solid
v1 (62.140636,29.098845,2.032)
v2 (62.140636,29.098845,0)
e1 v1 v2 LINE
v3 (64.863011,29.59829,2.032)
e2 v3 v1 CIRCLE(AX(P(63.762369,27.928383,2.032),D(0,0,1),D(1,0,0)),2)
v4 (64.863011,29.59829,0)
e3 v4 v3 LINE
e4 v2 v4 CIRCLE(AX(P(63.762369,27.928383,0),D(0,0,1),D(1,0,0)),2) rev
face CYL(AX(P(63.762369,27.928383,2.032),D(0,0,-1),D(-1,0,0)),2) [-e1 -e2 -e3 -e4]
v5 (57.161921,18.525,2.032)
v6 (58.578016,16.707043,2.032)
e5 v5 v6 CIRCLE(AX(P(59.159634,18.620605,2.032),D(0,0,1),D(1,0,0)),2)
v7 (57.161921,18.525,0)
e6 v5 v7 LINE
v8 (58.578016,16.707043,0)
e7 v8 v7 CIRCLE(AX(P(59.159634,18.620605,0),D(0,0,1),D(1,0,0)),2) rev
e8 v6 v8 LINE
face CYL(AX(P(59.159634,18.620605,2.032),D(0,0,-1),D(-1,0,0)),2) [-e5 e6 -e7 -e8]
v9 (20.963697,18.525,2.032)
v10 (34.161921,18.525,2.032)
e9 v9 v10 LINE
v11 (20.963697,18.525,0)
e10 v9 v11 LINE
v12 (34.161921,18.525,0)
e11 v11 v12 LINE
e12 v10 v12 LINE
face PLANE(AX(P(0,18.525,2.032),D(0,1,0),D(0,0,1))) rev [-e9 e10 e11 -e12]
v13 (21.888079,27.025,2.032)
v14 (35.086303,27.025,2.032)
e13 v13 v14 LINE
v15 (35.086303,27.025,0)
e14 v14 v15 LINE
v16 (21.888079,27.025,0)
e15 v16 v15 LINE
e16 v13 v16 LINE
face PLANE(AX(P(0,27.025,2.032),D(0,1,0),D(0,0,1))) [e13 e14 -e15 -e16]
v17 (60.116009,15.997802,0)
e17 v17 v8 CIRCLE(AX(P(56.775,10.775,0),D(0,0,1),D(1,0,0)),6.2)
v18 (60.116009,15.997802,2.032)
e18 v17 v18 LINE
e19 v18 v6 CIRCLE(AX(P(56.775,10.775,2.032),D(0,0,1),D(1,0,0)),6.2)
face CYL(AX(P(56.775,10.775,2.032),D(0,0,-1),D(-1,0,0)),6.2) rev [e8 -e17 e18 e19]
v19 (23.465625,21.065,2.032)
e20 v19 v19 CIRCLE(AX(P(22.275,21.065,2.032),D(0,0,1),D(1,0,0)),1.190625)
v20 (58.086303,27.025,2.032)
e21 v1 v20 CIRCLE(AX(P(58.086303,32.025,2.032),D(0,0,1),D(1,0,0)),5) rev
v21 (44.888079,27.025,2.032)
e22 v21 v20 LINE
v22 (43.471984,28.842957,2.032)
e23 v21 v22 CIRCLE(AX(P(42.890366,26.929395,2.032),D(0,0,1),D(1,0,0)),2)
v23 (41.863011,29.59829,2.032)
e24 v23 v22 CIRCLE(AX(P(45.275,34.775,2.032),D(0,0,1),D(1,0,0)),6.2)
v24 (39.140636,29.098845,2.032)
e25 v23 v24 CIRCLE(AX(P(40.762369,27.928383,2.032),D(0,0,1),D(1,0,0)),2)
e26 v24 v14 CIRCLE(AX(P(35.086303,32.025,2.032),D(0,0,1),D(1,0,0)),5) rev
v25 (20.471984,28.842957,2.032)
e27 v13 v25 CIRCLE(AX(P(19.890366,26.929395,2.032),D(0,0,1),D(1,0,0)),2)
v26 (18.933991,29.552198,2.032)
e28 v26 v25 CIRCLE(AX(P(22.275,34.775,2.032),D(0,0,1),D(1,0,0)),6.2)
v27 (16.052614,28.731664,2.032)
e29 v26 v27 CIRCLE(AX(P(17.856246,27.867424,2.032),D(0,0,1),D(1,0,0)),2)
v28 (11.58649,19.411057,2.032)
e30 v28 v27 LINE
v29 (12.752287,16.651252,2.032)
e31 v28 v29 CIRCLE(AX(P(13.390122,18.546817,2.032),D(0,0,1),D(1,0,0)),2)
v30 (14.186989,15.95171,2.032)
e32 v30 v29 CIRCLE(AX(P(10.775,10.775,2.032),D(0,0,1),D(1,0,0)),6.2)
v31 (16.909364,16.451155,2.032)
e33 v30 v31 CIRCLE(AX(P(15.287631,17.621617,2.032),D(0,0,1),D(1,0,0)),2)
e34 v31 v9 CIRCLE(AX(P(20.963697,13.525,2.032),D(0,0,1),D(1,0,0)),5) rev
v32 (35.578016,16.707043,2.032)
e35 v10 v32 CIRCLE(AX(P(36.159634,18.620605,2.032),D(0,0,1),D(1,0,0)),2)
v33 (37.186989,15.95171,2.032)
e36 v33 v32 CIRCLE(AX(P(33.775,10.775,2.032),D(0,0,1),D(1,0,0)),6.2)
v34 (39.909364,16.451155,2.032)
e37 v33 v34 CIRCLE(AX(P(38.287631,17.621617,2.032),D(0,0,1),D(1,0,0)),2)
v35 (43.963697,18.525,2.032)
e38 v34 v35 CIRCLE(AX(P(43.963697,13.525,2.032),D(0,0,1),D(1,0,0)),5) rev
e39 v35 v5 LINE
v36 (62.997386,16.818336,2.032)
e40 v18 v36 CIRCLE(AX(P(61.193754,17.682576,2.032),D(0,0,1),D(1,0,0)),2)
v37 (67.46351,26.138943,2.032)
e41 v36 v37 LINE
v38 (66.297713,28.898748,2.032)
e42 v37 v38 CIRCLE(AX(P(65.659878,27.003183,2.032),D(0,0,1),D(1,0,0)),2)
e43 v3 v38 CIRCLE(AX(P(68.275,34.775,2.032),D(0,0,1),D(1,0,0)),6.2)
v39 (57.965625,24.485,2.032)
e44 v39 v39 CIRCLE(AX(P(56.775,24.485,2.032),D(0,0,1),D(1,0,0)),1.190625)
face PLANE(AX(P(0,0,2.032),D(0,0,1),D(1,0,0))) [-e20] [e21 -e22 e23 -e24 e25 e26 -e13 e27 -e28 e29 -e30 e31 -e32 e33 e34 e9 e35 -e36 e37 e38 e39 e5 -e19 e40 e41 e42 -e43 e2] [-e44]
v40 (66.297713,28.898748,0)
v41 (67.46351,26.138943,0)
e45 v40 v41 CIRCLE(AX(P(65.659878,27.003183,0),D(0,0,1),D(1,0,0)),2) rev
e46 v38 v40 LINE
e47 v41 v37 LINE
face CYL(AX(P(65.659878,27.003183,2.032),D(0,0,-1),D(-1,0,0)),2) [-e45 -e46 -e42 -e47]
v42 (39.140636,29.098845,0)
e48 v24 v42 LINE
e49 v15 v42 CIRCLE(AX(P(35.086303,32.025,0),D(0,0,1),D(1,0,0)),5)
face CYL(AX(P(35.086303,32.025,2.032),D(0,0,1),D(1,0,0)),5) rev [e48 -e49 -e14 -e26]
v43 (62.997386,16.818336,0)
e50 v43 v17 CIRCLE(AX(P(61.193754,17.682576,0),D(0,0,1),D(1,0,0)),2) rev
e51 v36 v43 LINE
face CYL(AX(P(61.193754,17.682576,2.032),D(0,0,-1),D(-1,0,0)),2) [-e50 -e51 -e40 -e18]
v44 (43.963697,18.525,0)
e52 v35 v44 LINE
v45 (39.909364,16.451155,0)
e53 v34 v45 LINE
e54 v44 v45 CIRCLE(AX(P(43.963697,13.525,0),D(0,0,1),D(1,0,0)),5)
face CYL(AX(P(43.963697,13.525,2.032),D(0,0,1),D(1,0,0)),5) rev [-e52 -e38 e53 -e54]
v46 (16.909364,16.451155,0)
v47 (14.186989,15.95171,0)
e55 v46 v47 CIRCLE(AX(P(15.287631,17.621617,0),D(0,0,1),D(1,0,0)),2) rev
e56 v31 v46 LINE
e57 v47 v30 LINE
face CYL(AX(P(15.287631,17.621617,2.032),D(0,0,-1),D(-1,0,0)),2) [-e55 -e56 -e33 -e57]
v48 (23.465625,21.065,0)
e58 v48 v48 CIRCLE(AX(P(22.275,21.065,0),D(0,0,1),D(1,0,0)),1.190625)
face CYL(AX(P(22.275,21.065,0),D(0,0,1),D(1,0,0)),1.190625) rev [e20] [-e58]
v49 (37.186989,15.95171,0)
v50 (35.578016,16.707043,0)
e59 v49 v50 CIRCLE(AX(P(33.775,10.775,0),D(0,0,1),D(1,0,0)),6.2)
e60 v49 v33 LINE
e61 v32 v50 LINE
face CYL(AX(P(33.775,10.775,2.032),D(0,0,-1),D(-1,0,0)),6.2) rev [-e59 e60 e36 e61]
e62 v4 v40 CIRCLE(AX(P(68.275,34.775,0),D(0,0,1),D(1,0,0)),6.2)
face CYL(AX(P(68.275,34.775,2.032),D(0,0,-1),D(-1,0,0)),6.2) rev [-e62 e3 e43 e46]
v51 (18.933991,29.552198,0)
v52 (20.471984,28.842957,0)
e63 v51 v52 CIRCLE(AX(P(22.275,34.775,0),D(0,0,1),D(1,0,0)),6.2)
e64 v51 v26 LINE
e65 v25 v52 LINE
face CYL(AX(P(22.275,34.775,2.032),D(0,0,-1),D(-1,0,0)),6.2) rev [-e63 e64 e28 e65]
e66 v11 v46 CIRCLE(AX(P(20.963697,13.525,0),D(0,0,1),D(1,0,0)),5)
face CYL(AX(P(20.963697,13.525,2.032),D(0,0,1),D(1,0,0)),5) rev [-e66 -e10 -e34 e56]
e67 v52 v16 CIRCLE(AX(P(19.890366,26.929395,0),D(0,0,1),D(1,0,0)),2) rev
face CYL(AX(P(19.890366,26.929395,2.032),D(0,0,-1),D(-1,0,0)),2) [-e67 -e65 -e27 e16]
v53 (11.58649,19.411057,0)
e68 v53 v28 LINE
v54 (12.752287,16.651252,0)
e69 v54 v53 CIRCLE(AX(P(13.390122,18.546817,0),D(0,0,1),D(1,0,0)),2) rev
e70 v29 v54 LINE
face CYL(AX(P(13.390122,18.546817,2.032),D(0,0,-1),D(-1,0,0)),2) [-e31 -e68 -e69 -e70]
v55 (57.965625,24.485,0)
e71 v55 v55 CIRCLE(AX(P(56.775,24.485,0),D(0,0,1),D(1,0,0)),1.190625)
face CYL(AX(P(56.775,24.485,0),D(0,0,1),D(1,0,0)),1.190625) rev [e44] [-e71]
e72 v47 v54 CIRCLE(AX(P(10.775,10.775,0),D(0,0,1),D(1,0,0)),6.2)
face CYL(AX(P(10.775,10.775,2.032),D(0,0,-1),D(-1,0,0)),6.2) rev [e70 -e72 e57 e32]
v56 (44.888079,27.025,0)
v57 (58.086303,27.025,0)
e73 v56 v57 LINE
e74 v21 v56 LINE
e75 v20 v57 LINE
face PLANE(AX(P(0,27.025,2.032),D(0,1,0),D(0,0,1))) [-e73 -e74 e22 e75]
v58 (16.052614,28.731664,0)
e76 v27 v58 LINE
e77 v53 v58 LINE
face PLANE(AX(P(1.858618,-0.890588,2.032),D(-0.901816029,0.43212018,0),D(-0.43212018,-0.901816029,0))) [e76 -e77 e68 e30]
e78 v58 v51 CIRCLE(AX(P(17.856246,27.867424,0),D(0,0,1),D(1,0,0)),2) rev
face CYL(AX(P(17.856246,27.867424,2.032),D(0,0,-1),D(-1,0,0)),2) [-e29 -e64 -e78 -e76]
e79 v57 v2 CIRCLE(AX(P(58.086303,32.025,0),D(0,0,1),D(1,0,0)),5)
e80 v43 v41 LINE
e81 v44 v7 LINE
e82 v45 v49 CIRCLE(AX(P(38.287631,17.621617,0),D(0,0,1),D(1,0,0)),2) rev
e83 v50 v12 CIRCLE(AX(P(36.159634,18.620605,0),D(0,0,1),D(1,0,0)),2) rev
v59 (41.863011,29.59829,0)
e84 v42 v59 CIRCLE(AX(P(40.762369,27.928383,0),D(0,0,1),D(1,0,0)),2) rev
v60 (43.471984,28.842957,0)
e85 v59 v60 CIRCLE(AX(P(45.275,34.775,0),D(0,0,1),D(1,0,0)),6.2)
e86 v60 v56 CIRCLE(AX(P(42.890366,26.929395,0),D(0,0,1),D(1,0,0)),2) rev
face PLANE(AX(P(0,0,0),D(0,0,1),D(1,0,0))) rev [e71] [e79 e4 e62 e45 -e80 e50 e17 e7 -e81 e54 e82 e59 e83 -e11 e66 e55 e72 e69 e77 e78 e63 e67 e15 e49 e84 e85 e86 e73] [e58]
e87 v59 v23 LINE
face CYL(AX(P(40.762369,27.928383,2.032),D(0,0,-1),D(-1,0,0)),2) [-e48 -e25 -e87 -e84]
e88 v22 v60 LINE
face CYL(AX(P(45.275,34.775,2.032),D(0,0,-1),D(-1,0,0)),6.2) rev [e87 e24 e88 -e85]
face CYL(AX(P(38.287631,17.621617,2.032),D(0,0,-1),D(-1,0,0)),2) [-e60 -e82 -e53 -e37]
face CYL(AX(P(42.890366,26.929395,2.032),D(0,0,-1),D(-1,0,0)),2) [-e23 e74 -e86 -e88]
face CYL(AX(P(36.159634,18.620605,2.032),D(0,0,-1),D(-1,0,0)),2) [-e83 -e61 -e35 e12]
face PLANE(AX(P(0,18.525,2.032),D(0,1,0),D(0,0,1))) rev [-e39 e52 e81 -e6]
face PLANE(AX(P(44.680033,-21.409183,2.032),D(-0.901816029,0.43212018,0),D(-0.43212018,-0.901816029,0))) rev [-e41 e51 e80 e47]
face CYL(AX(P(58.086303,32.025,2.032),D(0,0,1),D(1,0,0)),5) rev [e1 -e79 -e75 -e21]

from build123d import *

# Parameters (mm, degrees)
BOSS_EXTRUDE1_DEPTH = 2.032
FILLET1_R           = 5
FILLET4_R           = 2
SKETCH5_R           = 1.190625
CUT_EXTRUDE1_DEPTH  = 75.011460165


with BuildPart() as part:
    # Sketch3 → Boss-Extrude1 (new body)
    with BuildSketch(Plane.XY):
        with BuildLine():
            Line((61.234837488, 27.025), (44.888079179, 27.025))
            Line((44.888079179, 27.025), (45.635822761, 28.585508346))
            ThreePointArc((45.635822761, 28.585508346), (42.595854881, 29.183740622), (40.224926589, 31.178229429))
            Line((40.224926589, 31.178229429), (38.234837488, 27.025))
            Line((38.234837488, 27.025), (21.888079179, 27.025))
            Line((21.888079179, 27.025), (22.635822761, 28.585508346))
            ThreePointArc((22.635822761, 28.585508346), (19.595854881, 29.183740622), (17.224926589, 31.178229429))
            Line((17.224926589, 31.178229429), (10.414177239, 16.964491654))
            ThreePointArc((10.414177239, 16.964491654), (13.454145119, 16.366259378), (15.825073411, 14.371770571))
            Line((15.825073411, 14.371770571), (17.815162512, 18.525))
            Line((17.815162512, 18.525), (34.161920821, 18.525))
            Line((34.161920821, 18.525), (33.414177239, 16.964491654))
            ThreePointArc((33.414177239, 16.964491654), (36.454145119, 16.366259378), (38.825073411, 14.371770571))
            Line((38.825073411, 14.371770571), (40.815162512, 18.525))
            Line((40.815162512, 18.525), (57.161920821, 18.525))
            Line((57.161920821, 18.525), (56.414177239, 16.964491654))
            ThreePointArc((56.414177239, 16.964491654), (59.454145119, 16.366259378), (61.825073411, 14.371770571))
            Line((61.825073411, 14.371770571), (68.635822761, 28.585508346))
            ThreePointArc((68.635822761, 28.585508346), (65.595854881, 29.183740622), (63.224926589, 31.178229429))
            Line((63.224926589, 31.178229429), (61.234837488, 27.025))
        make_face()
    extrude(amount=BOSS_EXTRUDE1_DEPTH)

    # Fillet1
    fillet1_edges = [part.edges().sort_by_distance(p)[0] for p in [
        (38.234837488, 27.025, 1.016),
        (61.234837488, 27.025, 1.016),
        (40.815162512, 18.525, 1.016),
        (17.815162512, 18.525, 1.016),
    ]]
    fillet(fillet1_edges, radius=FILLET1_R)

    # Fillet4
    # the kernel refuses this fillet: 2 mm, written as the material it takes off along each edge
    with BuildSketch(Plane(origin=(61.825073411, 14.371770571, -6.782329983), x_dir=(-0.7244869564055234, 0.6892885099856672, 0), z_dir=(0, 0, 1))) as fillet4_piece_1:
        with BuildLine():
            CenterArc((2.739483145, -1.963474497), FILLET4_R, 100.966900666, 97.004726409)
            Line((0.837064294, -2.580566482), (0.799015917, -2.592908322))
            Line((0.799015917, -2.592908322), (-0.038048377, -0.01234184))
            Line((-0.038048377, -0.01234184), (0.007609675, 0.03926949))
            ThreePointArc((0.007609675, 0.03926949), (1.179499687, -0.073229059), (2.351389699, 0.03926949))
            Line((2.351389699, 0.03926949), (2.358999374, 0))
        make_face()
    extrude(amount=15.596659966, mode=Mode.SUBTRACT)
    with BuildSketch(Plane(origin=(56.414177239, 16.964491654, -5.447751417), x_dir=(0.4321201804305817, 0.9018160287246183, 0), z_dir=(0, 0, 1)), Plane(origin=(33.414177239, 16.964491654, -5.447751417), x_dir=(0.4321201804305726, 0.9018160287246226, 0), z_dir=(0, 0, 1))) as fillet4_piece_2:
        with BuildLine():
            CenterArc((2.679877065, -1.760257284), FILLET4_R, 118.342114692, 70.353672363)
            Line((0.702867053, -2.062633556), (0.663326852, -2.068681081))
            ThreePointArc((0.663326852, -2.068681081), (0.404900733, -1.013097188), (-0.035005574, -0.019354839))
            Line((-0.035005574, -0.019354839), (0, 0.04))
            ThreePointArc((0, 0.04), (0.865203266, 0.04), (1.71141712, 0.035205146))
            Line((1.71141712, 0.035205146), (1.730406531, 0))
        make_face()
    extrude(amount=12.927502834, mode=Mode.SUBTRACT)
    with BuildSketch(Plane(origin=(68.635822761, 28.585508346, -6.782329983), x_dir=(-0.43212018043056016, -0.9018160287246285, 0), z_dir=(0, 0, 1))) as fillet4_piece_3:
        with BuildLine():
            CenterArc((2.712931993, -2), FILLET4_R, 90, 97.004726409)
            Line((0.727859803, -2.243902439), (0.688158359, -2.248780488))
            ThreePointArc((0.688158359, -2.248780488), (0.433586073, -1.099356687), (-0.035005574, -0.019354839))
            Line((-0.035005574, -0.019354839), (0, 0.04))
            Line((0, 0.04), (2.712931993, 0.04))
            Line((2.712931993, 0.04), (2.712931993, 0))
        make_face()
    extrude(amount=15.596659966, mode=Mode.SUBTRACT)
    with BuildSketch(Plane(origin=(63.224926589, 31.178229429, -5.862766834), x_dir=(0.7197655743666583, -0.6942171979695075, 0), z_dir=(0, 0, 1)), Plane(origin=(38.825073411, 14.371770571, -5.862766834), x_dir=(-0.7197655743666577, 0.6942171979695083, 0), z_dir=(0, 0, 1))) as fillet4_piece_4:
        with BuildLine():
            CenterArc((2.642931874, -1.966025629), FILLET4_R, 100.575844506, 87.569716535)
            Line((0.663109271, -2.249402518), (0.465127011, -2.277740206))
            ThreePointArc((0.465127011, -2.277740206), (0.269143449, -1.445696099), (-0.189816279, -0.063006193))
            Line((-0.189816279, -0.063006193), (0.036707387, 0.196602563))
            ThreePointArc((0.036707387, 0.196602563), (1.137929001, 0.094679449), (2.239150616, 0.196602563))
            Line((2.239150616, 0.196602563), (2.275858003, 0))
        make_face()
    extrude(amount=13.757533668, mode=Mode.SUBTRACT)
    with BuildSketch(Plane(origin=(45.635822761, 28.585508346, -5.447751417), x_dir=(-0.992996409987433, 0.11814452908226362, 0), z_dir=(0, 0, 1)), Plane(origin=(22.635822761, 28.585508346, -5.447751417), x_dir=(-0.9929964099874332, 0.11814452908226183, 0), z_dir=(0, 0, 1))) as fillet4_piece_5:
        with BuildLine():
            CenterArc((2.5305684, 1.968875405), FILLET4_R, 189.524957294, 70.353672363)
            Line((0.558141169, 1.637920999), (0.518692625, 1.631301911))
            ThreePointArc((0.518692625, 1.631301911), (0.241208476, 0.831862466), (-0.037862109, 0.012901966))
            Line((-0.037862109, 0.012901966), (0.007029357, -0.039377508))
            ThreePointArc((0.007029357, -0.039377508), (1.089550283, 0.056486243), (2.17207121, -0.039377508))
            Line((2.17207121, -0.039377508), (2.179100567, 0))
        make_face()
    extrude(amount=12.927502834, mode=Mode.SUBTRACT)
    with BuildSketch(Plane(origin=(40.224926589, 31.178229429, -5.862766834), x_dir=(-0.4623630437345738, -0.8866907103316808, 0), z_dir=(0, 0, 1)), Plane(origin=(15.825073411, 14.371770571, -5.862766834), x_dir=(0.46236304373457116, 0.886690710331682, 0), z_dir=(0, 0, 1))) as fillet4_piece_6:
        with BuildLine():
            CenterArc((2.633114962, 1.979154178), FILLET4_R, 174.150669546, 87.569716535)
            Line((0.643528297, 2.18297984), (0.44456963, 2.203362406))
            ThreePointArc((0.44456963, 2.203362406), (0.230948584, 1.118261759), (-0.178199689, 0.090801271))
            Line((-0.178199689, 0.090801271), (0.006761891, -0.199885659))
            ThreePointArc((0.006761891, -0.199885659), (1.462800781, -0.150629619), (2.316305911, -0.197915418))
            Line((2.316305911, -0.197915418), (2.345106734, 0))
        make_face()
    extrude(amount=13.757533668, mode=Mode.SUBTRACT)
    with BuildSketch(Plane(origin=(10.414177239, 16.964491654, -6.782329983), x_dir=(0.9911448562189062, -0.13278506689685937, 0), z_dir=(0, 0, 1))) as fillet4_piece_7:
        with BuildLine():
            CenterArc((2.739483145, 1.963474497), FILLET4_R, 162.028372925, 97.004726409)
            Line((0.837064294, 2.580566482), (0.799015917, 2.592908322))
            Line((0.799015917, 2.592908322), (-0.038048377, 0.01234184))
            Line((-0.038048377, 0.01234184), (0.007609675, -0.03926949))
            ThreePointArc((0.007609675, -0.03926949), (1.179499687, 0.073229059), (2.351389699, -0.03926949))
            Line((2.351389699, -0.03926949), (2.358999374, 0))
        make_face()
    extrude(amount=15.596659966, mode=Mode.SUBTRACT)
    with BuildSketch(Plane(origin=(17.224926589, 31.178229429, -6.782329983), x_dir=(-0.4321201804305535, -0.9018160287246317, 0), z_dir=(0, 0, 1))) as fillet4_piece_8:
        with BuildLine():
            CenterArc((2.712931993, 2), FILLET4_R, 172.995273591, 97.004726409)
            Line((0.727859803, 2.243902439), (0.688158359, 2.248780488))
            ThreePointArc((0.688158359, 2.248780488), (0.433586073, 1.099356687), (-0.035005574, 0.019354839))
            Line((-0.035005574, 0.019354839), (0, -0.04))
            Line((0, -0.04), (2.712931993, -0.04))
            Line((2.712931993, -0.04), (2.712931993, 0))
        make_face()
    extrude(amount=15.596659966, mode=Mode.SUBTRACT)

    # Sketch5 → Cut-Extrude1 (cut, through all)
    with BuildSketch(Plane.XY.offset(2.032)):
        with Locations((22.275, 21.065)):
            Circle(SKETCH5_R)
        with Locations((56.775, 24.485)):
            Circle(SKETCH5_R)
    extrude(amount=-CUT_EXTRUDE1_DEPTH, mode=Mode.SUBTRACT)


solid = part.part
